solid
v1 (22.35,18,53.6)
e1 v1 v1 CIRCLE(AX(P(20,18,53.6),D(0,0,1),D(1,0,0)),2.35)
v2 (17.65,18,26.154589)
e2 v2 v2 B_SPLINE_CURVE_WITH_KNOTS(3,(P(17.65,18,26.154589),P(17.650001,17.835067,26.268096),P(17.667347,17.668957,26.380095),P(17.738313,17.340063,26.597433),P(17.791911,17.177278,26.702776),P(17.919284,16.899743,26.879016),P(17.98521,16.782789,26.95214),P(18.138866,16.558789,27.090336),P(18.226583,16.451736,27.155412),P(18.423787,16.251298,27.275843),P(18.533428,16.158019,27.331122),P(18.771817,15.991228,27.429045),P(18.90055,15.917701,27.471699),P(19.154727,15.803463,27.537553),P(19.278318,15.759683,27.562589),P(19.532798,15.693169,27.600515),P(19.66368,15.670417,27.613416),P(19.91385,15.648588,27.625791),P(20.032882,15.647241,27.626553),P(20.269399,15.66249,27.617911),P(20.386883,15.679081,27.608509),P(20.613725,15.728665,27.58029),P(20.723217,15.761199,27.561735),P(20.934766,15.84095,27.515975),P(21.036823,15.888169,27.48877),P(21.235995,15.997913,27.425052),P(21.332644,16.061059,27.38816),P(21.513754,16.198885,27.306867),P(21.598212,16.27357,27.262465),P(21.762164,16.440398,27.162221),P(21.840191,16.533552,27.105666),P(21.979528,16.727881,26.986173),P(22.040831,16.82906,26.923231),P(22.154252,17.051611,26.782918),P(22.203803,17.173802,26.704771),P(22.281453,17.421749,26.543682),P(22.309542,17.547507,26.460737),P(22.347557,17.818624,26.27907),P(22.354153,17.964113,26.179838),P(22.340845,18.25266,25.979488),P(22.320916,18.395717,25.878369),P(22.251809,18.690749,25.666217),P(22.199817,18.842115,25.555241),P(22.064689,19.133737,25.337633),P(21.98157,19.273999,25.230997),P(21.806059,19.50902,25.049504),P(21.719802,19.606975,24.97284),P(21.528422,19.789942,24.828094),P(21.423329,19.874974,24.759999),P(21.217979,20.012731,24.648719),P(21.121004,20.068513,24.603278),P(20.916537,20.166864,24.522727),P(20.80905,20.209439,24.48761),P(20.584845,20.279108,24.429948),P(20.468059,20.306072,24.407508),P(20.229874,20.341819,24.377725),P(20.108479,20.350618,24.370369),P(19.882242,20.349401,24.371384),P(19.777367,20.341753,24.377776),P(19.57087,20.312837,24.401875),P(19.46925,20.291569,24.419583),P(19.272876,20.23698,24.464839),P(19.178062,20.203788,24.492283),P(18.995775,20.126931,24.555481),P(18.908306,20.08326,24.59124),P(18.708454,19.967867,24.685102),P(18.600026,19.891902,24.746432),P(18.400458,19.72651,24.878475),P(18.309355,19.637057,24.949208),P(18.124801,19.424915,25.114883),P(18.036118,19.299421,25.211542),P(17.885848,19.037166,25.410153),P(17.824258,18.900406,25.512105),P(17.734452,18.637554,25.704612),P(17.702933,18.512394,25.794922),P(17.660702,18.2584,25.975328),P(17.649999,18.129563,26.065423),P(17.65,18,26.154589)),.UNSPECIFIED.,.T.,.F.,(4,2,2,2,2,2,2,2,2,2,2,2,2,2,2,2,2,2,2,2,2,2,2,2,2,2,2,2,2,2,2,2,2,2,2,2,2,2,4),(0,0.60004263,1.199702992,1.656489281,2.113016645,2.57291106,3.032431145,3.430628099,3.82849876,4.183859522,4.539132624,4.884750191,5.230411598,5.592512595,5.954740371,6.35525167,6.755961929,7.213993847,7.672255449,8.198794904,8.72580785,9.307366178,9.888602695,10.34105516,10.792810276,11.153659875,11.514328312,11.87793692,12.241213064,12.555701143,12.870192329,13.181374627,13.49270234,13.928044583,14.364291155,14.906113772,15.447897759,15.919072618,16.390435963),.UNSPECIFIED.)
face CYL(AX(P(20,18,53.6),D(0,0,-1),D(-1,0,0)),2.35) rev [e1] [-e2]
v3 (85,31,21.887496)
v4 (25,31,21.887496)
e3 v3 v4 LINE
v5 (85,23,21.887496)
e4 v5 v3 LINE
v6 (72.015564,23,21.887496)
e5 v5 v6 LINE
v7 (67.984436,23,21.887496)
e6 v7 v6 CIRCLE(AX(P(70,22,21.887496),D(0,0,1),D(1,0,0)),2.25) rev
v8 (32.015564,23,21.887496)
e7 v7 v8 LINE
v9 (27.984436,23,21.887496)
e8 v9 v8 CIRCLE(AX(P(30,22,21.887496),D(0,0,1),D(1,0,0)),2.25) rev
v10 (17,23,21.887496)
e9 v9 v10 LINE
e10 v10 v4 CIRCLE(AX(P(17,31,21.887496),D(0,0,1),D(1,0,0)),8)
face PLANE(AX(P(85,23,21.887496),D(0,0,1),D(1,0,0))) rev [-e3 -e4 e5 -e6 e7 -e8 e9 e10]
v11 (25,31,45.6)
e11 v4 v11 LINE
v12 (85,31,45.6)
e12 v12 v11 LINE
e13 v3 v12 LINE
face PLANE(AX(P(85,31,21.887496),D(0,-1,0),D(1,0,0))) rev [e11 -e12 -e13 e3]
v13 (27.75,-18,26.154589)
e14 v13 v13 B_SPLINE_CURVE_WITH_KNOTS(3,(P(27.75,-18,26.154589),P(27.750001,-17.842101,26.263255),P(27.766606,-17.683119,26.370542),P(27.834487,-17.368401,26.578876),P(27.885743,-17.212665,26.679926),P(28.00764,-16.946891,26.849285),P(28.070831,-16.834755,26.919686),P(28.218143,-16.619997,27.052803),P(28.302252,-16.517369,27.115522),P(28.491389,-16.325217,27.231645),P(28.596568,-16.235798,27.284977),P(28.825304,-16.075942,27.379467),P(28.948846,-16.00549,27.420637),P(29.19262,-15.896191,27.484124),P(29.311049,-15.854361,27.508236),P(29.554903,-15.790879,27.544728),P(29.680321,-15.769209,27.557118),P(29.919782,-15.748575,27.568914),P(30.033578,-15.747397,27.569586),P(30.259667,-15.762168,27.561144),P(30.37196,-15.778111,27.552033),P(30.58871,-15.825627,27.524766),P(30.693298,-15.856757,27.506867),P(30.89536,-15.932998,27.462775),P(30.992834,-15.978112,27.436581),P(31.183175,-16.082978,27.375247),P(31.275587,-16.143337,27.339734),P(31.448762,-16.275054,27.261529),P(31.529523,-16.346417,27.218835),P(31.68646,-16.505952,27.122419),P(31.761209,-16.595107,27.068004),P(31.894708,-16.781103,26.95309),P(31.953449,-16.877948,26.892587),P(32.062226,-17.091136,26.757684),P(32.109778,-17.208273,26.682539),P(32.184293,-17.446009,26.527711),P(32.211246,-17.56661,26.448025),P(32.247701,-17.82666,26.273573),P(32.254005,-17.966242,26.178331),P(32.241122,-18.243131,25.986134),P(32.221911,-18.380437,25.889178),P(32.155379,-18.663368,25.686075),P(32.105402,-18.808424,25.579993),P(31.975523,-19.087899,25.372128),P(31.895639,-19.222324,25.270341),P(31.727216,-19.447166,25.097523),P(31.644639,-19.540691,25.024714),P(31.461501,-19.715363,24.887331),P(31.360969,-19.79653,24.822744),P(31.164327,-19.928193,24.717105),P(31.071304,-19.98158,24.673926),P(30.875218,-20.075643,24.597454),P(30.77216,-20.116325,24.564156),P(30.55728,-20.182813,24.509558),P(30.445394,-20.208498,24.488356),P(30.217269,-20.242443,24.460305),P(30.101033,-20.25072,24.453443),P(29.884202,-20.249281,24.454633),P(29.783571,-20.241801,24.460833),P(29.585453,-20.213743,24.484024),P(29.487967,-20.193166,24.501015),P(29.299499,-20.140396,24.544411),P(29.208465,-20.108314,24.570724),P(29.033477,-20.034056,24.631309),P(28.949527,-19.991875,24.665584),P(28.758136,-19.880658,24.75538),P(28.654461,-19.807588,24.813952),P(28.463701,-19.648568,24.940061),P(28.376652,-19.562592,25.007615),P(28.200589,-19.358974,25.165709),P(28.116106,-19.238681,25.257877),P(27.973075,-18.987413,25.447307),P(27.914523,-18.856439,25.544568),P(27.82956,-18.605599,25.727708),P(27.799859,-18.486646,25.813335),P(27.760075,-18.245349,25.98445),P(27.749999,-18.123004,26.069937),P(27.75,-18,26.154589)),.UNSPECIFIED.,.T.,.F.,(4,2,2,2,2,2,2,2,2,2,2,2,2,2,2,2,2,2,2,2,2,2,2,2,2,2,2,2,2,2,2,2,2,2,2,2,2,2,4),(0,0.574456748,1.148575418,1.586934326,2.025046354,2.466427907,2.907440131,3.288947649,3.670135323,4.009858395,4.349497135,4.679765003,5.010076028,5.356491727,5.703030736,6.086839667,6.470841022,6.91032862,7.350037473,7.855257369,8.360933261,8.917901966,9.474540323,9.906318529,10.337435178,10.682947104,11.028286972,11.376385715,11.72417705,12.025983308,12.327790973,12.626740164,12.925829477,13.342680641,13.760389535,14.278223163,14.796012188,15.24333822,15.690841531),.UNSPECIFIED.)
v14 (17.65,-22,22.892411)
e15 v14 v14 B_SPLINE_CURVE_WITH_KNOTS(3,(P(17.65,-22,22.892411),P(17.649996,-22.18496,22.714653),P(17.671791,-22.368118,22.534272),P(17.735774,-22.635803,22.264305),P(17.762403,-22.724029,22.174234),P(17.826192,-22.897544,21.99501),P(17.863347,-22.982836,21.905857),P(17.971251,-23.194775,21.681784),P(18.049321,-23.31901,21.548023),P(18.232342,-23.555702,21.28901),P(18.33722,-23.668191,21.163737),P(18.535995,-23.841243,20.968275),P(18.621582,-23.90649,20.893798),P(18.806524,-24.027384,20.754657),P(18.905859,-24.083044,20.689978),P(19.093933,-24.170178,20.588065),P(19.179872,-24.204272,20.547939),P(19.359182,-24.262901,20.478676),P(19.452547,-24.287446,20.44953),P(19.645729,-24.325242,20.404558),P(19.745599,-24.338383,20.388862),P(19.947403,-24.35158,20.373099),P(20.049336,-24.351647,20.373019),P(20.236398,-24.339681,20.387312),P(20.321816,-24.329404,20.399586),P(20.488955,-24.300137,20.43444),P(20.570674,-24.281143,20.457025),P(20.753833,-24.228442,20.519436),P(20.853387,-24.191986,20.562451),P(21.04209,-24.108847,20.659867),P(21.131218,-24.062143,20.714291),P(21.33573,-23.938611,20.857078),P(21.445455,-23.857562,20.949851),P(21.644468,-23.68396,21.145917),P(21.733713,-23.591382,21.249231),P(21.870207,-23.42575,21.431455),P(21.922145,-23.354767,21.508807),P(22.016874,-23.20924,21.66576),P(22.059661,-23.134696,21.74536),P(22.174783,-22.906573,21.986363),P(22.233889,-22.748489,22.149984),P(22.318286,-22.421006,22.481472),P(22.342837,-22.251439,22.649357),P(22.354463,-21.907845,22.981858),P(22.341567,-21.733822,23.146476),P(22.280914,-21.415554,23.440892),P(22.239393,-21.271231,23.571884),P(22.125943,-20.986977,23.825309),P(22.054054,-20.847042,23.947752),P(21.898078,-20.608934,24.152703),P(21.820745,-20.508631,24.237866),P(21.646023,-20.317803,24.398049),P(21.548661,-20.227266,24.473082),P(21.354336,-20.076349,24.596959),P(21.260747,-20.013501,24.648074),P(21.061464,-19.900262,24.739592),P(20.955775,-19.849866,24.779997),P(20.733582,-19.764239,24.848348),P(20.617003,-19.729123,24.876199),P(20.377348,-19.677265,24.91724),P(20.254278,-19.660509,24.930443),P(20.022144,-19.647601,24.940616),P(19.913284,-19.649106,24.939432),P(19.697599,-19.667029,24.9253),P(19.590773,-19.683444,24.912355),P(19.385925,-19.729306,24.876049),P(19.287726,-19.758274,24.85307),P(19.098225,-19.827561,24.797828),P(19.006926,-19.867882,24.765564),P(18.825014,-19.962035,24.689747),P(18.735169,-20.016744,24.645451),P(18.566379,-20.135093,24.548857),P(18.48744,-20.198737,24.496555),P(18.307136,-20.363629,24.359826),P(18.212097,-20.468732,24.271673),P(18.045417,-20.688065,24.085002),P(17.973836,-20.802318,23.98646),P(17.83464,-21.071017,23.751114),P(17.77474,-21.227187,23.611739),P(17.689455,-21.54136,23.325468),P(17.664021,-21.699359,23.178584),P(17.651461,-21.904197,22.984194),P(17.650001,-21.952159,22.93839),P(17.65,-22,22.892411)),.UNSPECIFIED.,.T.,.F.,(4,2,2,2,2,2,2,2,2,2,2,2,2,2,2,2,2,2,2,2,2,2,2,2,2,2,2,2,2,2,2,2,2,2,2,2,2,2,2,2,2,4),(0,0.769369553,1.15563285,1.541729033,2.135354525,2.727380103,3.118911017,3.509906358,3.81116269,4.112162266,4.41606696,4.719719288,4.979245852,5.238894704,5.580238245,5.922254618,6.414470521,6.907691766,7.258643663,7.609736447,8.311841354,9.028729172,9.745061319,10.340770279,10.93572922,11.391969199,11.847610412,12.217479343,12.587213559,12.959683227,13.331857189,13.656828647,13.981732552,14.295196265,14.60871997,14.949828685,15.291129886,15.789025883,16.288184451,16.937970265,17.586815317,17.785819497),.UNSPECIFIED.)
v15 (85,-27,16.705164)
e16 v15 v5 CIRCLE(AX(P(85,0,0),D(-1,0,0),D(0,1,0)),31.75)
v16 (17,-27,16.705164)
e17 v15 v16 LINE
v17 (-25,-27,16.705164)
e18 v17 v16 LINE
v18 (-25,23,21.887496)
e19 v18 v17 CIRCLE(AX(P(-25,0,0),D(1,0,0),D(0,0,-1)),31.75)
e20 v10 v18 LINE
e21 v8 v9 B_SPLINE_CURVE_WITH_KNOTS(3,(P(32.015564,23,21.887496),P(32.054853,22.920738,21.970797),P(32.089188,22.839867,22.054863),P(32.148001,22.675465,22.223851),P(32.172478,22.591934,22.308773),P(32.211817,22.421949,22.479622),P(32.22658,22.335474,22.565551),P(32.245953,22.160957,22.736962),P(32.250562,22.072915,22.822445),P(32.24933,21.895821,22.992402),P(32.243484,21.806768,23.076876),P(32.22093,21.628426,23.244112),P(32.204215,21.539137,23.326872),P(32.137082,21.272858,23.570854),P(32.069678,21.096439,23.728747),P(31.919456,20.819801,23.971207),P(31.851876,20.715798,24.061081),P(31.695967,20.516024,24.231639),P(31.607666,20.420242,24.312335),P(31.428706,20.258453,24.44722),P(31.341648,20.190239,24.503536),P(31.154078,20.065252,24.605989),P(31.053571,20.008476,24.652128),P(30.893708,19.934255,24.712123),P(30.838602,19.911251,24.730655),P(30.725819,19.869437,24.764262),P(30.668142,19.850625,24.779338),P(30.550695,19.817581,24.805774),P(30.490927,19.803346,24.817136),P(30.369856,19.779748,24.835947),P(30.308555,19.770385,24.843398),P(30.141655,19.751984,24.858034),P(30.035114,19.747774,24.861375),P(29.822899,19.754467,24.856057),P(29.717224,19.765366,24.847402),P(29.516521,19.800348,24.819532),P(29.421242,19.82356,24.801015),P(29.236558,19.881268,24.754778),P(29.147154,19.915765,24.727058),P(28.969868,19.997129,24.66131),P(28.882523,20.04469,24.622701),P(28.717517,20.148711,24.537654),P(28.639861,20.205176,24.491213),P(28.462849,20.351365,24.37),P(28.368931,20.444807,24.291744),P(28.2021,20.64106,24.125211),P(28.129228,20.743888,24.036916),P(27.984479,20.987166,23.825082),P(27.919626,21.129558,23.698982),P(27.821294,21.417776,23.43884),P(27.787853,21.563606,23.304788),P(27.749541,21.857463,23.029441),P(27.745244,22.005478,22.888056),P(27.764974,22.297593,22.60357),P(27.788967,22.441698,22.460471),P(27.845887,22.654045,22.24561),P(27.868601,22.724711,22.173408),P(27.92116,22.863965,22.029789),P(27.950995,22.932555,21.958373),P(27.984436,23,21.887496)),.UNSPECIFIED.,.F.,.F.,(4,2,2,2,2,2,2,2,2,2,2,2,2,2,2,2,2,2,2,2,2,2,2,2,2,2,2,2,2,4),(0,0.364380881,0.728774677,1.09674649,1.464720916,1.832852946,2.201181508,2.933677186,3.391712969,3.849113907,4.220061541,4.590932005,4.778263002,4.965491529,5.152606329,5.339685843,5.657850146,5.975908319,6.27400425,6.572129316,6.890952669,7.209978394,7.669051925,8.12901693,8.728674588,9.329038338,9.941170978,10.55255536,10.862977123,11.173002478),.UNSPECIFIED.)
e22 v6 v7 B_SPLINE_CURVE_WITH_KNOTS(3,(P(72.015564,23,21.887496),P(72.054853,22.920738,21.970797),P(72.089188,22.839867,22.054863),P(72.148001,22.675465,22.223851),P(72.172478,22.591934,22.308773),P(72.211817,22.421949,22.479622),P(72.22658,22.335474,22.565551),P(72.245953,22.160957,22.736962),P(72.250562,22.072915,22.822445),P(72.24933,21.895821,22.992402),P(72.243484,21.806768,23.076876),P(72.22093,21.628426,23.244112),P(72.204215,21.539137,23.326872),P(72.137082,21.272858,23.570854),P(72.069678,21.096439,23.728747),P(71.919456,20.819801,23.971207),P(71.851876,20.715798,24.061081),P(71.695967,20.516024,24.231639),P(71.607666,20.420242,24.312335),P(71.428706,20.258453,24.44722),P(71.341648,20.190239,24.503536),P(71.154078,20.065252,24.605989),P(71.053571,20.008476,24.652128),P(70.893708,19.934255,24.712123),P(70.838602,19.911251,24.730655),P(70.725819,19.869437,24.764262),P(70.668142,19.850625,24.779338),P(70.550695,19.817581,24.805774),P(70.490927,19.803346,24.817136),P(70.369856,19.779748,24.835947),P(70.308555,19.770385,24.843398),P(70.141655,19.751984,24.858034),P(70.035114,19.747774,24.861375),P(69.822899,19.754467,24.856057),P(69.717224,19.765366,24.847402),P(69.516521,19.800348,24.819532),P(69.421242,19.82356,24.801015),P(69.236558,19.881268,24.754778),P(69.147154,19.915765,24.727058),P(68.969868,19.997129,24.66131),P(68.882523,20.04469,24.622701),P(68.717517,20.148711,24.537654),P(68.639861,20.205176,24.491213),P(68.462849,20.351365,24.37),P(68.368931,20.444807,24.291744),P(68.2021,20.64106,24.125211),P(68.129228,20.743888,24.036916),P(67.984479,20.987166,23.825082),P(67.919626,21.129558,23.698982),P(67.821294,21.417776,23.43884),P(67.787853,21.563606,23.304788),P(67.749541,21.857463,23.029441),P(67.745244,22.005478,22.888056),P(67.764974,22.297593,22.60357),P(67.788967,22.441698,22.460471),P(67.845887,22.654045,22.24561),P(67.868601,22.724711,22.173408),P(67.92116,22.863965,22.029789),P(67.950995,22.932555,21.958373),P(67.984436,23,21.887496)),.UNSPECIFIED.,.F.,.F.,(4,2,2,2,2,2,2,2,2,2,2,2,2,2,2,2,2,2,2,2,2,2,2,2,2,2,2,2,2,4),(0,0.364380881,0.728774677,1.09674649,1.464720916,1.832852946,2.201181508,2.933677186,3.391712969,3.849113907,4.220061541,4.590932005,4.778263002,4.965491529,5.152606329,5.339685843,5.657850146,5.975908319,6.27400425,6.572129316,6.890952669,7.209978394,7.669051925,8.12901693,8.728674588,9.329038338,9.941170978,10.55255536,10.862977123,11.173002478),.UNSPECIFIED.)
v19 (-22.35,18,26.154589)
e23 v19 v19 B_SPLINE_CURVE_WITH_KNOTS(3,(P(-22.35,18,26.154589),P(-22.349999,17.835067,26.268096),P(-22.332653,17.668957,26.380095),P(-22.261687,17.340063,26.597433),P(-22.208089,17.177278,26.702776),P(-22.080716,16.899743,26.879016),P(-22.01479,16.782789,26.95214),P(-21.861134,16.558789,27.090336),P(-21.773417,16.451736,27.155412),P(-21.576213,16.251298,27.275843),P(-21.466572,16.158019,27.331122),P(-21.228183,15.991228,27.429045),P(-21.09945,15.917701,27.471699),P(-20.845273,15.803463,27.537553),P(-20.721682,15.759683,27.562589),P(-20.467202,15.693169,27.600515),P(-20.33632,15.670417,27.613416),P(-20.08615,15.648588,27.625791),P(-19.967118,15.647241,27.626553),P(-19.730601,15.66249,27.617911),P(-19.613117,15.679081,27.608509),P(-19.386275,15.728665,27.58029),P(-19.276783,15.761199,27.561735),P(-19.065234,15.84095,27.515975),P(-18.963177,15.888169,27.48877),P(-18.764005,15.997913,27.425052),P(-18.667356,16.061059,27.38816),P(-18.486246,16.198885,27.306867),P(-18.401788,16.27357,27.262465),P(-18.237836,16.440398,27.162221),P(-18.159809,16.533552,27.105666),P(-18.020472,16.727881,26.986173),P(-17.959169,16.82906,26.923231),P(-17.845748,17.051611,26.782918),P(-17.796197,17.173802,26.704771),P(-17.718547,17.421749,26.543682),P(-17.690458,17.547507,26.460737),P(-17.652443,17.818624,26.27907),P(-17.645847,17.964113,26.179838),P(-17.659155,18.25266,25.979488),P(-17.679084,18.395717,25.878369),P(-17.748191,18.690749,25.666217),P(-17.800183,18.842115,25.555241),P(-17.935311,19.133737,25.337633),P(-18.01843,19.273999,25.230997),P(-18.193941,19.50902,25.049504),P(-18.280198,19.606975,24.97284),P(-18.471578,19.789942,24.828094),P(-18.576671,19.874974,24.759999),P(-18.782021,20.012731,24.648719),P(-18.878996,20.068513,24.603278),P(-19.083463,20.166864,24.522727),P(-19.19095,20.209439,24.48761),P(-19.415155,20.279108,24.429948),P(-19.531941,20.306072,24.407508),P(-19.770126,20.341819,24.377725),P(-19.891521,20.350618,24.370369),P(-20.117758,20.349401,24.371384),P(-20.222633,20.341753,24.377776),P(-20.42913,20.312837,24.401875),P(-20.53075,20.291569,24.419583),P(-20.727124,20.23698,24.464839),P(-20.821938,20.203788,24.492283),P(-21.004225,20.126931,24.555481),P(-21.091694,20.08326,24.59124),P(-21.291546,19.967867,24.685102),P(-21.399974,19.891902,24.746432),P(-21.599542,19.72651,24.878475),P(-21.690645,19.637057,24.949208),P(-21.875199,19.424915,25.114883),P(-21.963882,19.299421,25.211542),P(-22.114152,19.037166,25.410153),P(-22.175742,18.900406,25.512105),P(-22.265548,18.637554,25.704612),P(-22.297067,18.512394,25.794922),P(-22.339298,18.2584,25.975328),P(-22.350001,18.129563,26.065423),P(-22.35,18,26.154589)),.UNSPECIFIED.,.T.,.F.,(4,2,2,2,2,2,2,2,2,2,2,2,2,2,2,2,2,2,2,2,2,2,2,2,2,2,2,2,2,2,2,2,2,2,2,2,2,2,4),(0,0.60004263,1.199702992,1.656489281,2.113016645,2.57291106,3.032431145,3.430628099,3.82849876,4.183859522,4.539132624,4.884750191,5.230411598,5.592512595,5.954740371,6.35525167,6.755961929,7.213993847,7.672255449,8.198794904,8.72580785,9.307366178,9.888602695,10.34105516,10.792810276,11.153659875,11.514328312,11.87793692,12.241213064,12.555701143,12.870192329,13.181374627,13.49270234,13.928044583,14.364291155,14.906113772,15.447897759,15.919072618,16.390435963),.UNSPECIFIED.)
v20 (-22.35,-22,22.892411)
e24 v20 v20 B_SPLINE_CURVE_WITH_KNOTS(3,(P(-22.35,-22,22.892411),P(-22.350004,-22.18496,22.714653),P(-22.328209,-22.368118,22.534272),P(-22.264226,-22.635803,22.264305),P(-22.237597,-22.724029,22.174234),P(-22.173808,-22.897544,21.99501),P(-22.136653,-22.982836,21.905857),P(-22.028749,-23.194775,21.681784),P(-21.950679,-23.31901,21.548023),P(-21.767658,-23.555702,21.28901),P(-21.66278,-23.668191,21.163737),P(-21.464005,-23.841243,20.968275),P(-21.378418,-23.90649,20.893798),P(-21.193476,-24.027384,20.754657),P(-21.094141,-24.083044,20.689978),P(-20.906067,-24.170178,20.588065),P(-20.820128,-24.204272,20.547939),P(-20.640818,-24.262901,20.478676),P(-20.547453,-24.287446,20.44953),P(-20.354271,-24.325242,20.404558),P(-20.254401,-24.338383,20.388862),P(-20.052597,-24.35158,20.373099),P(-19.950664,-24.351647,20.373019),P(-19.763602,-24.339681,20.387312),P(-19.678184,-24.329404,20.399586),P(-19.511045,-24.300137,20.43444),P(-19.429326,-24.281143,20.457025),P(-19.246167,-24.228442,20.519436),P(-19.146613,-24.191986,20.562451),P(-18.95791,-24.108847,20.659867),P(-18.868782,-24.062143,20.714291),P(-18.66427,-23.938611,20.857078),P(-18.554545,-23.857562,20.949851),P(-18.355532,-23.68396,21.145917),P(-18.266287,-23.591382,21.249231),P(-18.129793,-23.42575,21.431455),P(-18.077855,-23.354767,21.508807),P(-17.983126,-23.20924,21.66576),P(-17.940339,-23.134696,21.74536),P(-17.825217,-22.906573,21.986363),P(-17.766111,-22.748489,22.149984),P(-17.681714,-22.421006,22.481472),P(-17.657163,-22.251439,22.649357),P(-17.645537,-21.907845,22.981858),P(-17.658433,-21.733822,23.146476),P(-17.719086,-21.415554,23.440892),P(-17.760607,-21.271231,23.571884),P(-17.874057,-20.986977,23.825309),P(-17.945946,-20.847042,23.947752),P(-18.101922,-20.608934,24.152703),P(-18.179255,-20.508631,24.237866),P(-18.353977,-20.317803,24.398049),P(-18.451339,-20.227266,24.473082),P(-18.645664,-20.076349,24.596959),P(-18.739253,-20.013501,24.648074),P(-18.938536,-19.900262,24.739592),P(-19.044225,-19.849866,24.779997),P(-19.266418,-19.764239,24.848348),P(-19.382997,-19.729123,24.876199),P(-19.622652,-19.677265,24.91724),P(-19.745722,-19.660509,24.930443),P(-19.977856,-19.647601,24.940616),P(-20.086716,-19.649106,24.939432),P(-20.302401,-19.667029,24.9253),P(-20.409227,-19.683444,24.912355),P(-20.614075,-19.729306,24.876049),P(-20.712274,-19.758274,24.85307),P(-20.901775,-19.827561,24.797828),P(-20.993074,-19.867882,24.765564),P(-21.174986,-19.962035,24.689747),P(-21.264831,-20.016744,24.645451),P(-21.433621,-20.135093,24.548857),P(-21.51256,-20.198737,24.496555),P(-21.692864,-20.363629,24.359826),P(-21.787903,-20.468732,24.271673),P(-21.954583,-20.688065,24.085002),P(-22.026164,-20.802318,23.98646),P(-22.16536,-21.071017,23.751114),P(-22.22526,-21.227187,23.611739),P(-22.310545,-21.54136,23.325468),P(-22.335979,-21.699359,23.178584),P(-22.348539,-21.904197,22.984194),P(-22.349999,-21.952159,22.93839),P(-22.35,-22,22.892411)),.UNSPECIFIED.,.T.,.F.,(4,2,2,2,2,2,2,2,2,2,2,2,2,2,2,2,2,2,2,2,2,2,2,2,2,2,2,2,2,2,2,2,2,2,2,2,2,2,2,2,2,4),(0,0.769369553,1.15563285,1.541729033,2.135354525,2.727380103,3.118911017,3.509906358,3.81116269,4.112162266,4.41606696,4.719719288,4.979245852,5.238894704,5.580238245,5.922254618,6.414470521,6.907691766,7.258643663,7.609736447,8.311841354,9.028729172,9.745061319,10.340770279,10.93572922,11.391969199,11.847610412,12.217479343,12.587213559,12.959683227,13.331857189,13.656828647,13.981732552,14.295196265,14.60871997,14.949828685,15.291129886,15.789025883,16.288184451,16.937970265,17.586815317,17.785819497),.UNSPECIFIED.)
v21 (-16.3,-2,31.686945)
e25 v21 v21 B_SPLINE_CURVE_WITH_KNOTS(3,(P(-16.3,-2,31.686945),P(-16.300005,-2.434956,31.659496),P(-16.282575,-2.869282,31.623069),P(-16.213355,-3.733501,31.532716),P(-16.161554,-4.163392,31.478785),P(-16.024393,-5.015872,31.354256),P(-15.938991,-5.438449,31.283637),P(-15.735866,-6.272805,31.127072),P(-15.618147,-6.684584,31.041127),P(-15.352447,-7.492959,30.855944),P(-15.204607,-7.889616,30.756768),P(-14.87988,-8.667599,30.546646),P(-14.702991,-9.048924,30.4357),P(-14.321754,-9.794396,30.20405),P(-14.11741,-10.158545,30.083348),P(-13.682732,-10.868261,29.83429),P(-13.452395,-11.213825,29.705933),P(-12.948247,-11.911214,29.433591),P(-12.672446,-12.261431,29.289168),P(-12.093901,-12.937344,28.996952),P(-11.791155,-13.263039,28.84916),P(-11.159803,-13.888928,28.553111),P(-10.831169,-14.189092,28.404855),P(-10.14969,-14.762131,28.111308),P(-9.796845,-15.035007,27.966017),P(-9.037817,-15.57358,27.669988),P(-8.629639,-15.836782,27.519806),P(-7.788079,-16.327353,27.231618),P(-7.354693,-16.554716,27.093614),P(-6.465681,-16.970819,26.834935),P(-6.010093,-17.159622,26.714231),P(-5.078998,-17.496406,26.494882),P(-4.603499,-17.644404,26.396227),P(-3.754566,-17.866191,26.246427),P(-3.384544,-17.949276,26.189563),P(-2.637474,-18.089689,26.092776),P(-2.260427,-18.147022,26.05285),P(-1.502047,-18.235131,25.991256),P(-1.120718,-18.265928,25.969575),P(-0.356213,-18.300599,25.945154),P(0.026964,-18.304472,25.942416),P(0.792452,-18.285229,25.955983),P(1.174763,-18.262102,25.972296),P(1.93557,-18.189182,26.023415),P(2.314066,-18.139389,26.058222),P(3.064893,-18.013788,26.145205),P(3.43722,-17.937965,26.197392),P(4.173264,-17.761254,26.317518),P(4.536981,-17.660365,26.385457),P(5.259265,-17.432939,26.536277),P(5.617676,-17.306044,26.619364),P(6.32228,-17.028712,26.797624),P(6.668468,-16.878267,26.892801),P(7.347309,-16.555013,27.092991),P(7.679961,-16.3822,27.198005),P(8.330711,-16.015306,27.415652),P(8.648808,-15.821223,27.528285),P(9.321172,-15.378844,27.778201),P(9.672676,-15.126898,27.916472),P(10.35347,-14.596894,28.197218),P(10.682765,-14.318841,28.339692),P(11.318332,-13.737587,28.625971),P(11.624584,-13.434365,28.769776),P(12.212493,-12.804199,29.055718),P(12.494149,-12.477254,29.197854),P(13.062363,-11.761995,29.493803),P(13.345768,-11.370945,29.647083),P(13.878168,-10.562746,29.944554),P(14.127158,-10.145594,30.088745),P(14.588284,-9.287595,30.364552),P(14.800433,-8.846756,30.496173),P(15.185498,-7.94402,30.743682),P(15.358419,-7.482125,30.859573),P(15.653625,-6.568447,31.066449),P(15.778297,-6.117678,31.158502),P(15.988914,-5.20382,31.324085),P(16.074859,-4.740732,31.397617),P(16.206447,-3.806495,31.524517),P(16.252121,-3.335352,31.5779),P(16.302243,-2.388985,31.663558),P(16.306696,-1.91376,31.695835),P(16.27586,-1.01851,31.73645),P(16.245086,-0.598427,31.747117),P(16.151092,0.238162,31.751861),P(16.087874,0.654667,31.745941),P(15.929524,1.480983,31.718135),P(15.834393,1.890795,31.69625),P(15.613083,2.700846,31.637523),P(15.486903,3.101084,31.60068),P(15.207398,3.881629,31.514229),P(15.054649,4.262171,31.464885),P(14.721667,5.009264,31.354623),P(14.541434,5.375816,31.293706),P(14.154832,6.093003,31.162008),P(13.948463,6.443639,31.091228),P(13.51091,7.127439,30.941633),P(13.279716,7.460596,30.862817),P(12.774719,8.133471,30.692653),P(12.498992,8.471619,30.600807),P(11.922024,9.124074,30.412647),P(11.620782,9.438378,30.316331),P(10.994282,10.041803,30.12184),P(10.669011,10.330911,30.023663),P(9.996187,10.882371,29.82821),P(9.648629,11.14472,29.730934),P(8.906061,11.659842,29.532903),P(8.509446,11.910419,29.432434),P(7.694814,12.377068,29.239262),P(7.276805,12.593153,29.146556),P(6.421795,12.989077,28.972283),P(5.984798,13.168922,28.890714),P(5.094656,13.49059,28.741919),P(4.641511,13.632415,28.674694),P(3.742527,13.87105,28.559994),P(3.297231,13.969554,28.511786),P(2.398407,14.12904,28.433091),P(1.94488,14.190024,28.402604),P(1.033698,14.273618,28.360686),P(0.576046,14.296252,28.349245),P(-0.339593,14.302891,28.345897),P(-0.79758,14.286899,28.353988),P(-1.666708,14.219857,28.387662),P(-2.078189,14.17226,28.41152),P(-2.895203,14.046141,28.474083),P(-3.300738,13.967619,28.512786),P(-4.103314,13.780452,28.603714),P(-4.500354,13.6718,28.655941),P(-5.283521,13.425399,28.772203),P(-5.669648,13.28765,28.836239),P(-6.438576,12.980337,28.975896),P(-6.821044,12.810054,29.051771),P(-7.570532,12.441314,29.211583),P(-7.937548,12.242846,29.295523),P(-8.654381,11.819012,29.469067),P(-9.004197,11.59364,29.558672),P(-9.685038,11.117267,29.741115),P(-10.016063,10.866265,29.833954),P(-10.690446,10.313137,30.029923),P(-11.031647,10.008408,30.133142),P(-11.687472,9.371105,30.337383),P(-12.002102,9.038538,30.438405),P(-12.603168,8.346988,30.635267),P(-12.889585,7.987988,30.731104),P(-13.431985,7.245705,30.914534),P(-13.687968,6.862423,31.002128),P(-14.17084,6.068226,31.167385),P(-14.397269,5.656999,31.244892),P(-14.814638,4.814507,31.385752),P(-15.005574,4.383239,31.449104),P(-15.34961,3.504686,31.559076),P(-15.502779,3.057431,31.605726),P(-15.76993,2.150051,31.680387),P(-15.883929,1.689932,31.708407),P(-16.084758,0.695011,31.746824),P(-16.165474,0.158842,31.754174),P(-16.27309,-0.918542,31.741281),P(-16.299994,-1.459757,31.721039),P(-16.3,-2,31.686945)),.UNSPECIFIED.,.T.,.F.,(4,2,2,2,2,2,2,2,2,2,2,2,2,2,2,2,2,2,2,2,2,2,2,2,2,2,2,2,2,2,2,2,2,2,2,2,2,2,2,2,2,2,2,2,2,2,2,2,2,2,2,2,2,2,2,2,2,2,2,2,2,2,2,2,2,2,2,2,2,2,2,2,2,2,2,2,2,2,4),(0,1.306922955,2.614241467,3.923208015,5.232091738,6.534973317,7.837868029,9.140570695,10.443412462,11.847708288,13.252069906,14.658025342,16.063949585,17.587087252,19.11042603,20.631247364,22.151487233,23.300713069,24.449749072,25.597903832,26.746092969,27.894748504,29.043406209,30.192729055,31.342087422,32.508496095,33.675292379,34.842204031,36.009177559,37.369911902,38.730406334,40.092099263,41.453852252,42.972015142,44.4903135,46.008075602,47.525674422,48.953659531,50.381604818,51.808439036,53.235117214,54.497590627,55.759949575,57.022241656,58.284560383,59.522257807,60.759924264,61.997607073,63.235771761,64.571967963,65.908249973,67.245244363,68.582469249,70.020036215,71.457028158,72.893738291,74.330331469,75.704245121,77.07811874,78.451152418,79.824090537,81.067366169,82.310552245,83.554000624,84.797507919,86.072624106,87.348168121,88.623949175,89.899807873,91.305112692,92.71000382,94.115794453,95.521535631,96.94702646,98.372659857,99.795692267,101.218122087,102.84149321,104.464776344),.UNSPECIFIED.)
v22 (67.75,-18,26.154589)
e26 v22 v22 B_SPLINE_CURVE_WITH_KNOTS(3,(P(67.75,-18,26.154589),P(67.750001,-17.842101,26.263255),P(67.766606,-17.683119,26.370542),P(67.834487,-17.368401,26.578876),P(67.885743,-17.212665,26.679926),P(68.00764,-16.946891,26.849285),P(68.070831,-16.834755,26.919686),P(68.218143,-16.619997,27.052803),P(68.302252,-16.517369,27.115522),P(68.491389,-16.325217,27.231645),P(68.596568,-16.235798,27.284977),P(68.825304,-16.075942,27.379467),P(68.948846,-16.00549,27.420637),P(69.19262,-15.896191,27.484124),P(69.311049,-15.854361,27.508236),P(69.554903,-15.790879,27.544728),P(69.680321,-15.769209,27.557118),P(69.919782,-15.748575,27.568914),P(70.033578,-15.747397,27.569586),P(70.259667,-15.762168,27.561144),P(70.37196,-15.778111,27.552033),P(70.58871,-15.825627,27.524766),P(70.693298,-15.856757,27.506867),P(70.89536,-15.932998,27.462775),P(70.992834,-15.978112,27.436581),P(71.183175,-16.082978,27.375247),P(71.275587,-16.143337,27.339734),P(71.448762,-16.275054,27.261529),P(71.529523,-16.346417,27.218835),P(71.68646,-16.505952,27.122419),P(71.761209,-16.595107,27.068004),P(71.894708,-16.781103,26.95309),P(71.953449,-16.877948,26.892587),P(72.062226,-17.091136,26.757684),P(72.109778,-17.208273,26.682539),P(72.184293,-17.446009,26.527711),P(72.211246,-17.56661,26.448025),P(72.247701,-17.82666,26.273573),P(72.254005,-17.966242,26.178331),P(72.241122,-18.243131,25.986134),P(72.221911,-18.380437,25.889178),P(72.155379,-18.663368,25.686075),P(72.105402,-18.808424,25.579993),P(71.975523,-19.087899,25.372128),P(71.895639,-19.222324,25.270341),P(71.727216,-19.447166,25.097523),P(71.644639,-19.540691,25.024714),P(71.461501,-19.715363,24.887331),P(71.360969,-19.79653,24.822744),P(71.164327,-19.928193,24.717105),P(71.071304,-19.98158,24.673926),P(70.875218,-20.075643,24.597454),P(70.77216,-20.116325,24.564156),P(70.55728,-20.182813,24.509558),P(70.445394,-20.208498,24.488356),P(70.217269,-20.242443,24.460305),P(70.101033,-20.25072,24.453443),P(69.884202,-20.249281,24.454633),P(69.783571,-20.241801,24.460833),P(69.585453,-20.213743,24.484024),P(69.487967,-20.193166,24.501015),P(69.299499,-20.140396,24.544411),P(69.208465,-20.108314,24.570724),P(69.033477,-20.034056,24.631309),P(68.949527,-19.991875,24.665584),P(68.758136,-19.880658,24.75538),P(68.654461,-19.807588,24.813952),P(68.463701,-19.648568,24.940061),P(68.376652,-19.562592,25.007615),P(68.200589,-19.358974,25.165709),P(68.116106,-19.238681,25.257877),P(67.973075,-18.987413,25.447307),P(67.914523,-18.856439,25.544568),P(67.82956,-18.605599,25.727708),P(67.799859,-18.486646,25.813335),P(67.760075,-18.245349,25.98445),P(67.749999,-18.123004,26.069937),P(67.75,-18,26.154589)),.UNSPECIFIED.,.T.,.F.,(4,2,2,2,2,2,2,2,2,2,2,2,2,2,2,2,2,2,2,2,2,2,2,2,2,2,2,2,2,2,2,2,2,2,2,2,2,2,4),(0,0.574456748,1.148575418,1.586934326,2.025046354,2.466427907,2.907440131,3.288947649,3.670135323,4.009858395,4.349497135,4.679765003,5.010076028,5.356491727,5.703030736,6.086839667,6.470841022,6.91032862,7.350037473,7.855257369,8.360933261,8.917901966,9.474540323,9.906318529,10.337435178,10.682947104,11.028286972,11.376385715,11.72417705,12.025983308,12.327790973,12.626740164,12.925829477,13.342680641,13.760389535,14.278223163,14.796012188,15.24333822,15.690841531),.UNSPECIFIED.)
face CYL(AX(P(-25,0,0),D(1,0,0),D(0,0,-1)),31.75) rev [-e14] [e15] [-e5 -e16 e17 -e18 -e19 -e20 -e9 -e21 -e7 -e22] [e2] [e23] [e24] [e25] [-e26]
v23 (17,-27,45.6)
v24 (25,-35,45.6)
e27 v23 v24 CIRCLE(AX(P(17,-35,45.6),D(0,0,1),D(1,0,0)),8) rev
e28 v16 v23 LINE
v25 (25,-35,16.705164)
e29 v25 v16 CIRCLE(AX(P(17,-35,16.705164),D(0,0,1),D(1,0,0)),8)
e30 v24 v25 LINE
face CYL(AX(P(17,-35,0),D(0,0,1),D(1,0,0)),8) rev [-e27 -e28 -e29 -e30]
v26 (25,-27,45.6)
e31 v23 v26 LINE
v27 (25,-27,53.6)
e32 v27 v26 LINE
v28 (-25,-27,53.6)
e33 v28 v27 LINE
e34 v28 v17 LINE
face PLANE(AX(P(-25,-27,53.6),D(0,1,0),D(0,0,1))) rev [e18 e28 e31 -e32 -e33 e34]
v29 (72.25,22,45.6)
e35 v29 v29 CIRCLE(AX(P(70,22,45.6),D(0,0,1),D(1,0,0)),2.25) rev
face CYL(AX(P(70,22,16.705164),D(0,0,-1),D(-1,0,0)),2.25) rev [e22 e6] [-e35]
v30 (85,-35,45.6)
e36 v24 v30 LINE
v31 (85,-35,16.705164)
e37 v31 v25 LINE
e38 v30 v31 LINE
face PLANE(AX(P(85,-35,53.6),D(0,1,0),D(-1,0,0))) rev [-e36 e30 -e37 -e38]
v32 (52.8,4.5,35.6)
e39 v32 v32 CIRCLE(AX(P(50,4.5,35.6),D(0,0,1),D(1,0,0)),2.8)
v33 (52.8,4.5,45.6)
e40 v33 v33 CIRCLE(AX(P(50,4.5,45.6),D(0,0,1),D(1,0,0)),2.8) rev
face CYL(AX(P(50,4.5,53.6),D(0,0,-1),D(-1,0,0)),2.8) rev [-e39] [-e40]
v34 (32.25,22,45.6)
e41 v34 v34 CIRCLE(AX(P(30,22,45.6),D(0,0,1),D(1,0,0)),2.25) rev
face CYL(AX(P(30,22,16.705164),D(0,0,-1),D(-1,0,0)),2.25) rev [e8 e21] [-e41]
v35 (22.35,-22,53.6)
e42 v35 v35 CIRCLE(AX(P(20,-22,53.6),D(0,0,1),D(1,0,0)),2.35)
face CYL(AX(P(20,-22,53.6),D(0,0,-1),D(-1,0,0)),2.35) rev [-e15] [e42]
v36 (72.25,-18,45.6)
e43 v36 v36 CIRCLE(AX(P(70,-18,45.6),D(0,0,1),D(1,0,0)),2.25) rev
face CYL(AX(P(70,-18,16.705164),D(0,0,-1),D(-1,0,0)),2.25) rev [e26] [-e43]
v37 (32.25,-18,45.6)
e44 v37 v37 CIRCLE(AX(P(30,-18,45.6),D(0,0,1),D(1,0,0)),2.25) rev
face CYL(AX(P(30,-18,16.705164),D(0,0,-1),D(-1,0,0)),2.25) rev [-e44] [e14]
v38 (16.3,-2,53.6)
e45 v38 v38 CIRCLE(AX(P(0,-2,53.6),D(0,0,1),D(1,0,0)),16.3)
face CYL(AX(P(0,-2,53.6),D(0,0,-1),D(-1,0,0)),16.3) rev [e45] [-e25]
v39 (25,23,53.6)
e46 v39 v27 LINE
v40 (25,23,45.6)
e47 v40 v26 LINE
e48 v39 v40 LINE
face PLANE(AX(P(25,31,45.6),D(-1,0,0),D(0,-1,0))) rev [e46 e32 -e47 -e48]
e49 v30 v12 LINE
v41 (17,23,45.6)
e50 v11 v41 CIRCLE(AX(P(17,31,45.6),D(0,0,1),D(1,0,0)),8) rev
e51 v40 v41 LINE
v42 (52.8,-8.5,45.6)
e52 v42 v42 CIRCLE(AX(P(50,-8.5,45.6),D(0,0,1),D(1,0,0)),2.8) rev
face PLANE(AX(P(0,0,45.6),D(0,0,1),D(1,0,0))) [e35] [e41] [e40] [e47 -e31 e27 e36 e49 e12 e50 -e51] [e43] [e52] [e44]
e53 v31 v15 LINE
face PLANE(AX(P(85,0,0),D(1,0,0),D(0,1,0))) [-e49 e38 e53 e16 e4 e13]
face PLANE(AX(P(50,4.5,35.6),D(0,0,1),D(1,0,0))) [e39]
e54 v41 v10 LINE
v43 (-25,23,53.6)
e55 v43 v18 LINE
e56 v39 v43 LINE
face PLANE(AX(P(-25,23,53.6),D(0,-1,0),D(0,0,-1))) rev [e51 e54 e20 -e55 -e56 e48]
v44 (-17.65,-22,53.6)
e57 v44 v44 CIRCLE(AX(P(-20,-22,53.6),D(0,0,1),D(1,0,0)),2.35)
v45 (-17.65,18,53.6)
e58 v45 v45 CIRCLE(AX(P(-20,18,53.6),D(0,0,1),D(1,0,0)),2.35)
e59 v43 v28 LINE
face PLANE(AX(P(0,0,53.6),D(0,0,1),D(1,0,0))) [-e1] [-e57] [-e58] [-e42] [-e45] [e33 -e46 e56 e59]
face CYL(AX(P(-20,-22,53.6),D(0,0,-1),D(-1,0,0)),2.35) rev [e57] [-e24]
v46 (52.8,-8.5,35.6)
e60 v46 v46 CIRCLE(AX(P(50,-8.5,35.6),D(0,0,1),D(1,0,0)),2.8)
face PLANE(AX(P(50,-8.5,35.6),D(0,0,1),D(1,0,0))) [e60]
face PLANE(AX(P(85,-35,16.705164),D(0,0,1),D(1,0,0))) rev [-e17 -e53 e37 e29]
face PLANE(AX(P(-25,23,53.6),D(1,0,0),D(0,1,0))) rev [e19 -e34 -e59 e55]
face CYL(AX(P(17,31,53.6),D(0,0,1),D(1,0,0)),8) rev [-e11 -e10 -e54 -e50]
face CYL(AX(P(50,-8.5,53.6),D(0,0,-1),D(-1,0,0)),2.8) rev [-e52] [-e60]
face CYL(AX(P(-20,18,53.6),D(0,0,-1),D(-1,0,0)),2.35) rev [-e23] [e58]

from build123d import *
from build123d.topology import SkipClean

# Parameters (mm, degrees)
SKETCH1_W               = 50
SKETCH1_H               = 50
SKETCH1_R               = 16.3
SKETCH1_R_2             = 2.35
BOSS_EXTRUDE1_DEPTH     = 53.6
CUT_EXTRUDE1_DEPTH      = 66.015075175
CUT_EXTRUDE1_DEPTH_BACK = 66.015075175
SKETCH2_R               = 31.75
BOSS_EXTRUDE3_START     = 60
BOSS_EXTRUDE3_DEPTH     = 60
SKETCH12_W              = 60
SKETCH12_H              = 66
CUT_EXTRUDE7_DEPTH      = 8
CUT_EXTRUDE5_DEPTH      = 107.409398132
CUT_EXTRUDE5_DEPTH_BACK = 107.409398132
SKETCH9_R               = 2.25
CUT_EXTRUDE6_DEPTH      = 97.358246028
CUT_EXTRUDE6_DEPTH_BACK = 10
SKETCH10_R              = 2.8
FILLET1_R               = 8


with BuildPart() as part:
    # Sketch1 → Boss-Extrude1 (new body)
    with BuildSketch(Plane.XY):
        with Locations((0, -2)):
            Rectangle(SKETCH1_W, SKETCH1_H)
        with Locations((0, -2)):
            Circle(SKETCH1_R, mode=Mode.SUBTRACT)
        with Locations((-20, 18)):
            Circle(SKETCH1_R_2, mode=Mode.SUBTRACT)
        with Locations((20, 18)):
            Circle(SKETCH1_R_2, mode=Mode.SUBTRACT)
        with Locations((20, -22)):
            Circle(SKETCH1_R_2, mode=Mode.SUBTRACT)
        with Locations((-20, -22)):
            Circle(SKETCH1_R_2, mode=Mode.SUBTRACT)
    extrude(amount=BOSS_EXTRUDE1_DEPTH)

    # Sketch2 → Cut-Extrude1 (cut, two sides: drawn at the far end of the back side and taken through both)
    with BuildSketch(Plane(origin=(0, 0, 0), x_dir=(0, 0, -1), z_dir=(1, 0, 0)).offset(-CUT_EXTRUDE1_DEPTH_BACK)):
        Circle(SKETCH2_R)
    extrude(amount=CUT_EXTRUDE1_DEPTH + CUT_EXTRUDE1_DEPTH_BACK, mode=Mode.SUBTRACT)

    # Sketch4 → Boss-Extrude3 (add)
    with SkipClean():  # the faces are left unmerged after this step: merging them gives an invalid solid
        with BuildSketch(Plane(origin=(25, 0, 0), x_dir=(0, 0, -1), z_dir=(1, 0, 0)).offset(BOSS_EXTRUDE3_START)):
            with BuildLine():
                Line((-53.6, -27), (-53.6, -35))
                Line((-53.6, -35), (-16.705163872, -35))
                Line((-16.705163872, -35), (-16.705163872, -27))
                ThreePointArc((-16.705163872, -27), (-31.580822619, -3.273246506), (-21.887496431, 23))
                Line((-21.887496431, 23), (-21.887496431, 31))
                Line((-21.887496431, 31), (-53.6, 31))
                Line((-53.6, 31), (-53.6, 23))
                Line((-53.6, 23), (-53.6, -27))
            make_face()
        extrude(amount=-BOSS_EXTRUDE3_DEPTH)

    # Sketch12 → Cut-Extrude7 (cut)
    with SkipClean():  # the faces are left unmerged after this step: merging them gives an invalid solid
        with BuildSketch(Plane.XY.offset(53.6)):
            with Locations((55, -2)):
                Rectangle(SKETCH12_W, SKETCH12_H)
        extrude(amount=-CUT_EXTRUDE7_DEPTH, mode=Mode.SUBTRACT)

    # Sketch9 → Cut-Extrude5 (cut, two sides: drawn at the far end of the back side and taken through both)
    with SkipClean():  # the faces are left unmerged after this step: merging them gives an invalid solid
        with BuildSketch(Plane.XY.offset(-CUT_EXTRUDE5_DEPTH_BACK)):
            with Locations(Location((30, 22, 0), (0, 0, 153.612200039))):
                Circle(SKETCH9_R)
            with Locations(Location((70, 22, 0), (0, 0, 153.612200039))):
                Circle(SKETCH9_R)
            with Locations(Location((70, -18, 0), (0, 0, 180))):
                Circle(SKETCH9_R)
            with Locations(Location((30, -18, 0), (0, 0, 180))):
                Circle(SKETCH9_R)
        extrude(amount=CUT_EXTRUDE5_DEPTH + CUT_EXTRUDE5_DEPTH_BACK, mode=Mode.SUBTRACT)

    # Sketch10 → Cut-Extrude6 (cut, two sides: drawn at the far end of the back side and taken through both)
    with SkipClean():  # the faces are left unmerged after this step: merging them gives an invalid solid
        with BuildSketch(Plane.XY.offset(45.6).offset(-CUT_EXTRUDE6_DEPTH_BACK)):
            with Locations((50, 4.5)):
                Circle(SKETCH10_R)
            with Locations((50, -8.5)):
                Circle(SKETCH10_R)
        extrude(amount=CUT_EXTRUDE6_DEPTH + CUT_EXTRUDE6_DEPTH_BACK, mode=Mode.SUBTRACT)

    # Fillet1
    # the kernel refuses this fillet: 8 mm, written as the material it adds along each edge
    with BuildSketch(Plane(origin=(25, 23, 21.887496431), x_dir=(-1, 0, 0), z_dir=(0, 0, 1))) as fillet1_piece_1:
        with BuildLine():
            CenterArc((FILLET1_R, -FILLET1_R), FILLET1_R, 90, 90)
            Line((0, -FILLET1_R), (0, 0))
            Line((0, 0), (FILLET1_R, 0))
        make_face()
    extrude(amount=23.712503569)
    with BuildSketch(Plane(origin=(25, -27, 16.705163872), x_dir=(-1, 0, 0), z_dir=(0, 0, 1))) as fillet1_piece_2:
        with BuildLine():
            CenterArc((FILLET1_R, FILLET1_R), FILLET1_R, 180, 90)
            Line((0, FILLET1_R), (0, 0))
            Line((0, 0), (FILLET1_R, 0))
        make_face()
    extrude(amount=28.894836128)


solid = part.part
